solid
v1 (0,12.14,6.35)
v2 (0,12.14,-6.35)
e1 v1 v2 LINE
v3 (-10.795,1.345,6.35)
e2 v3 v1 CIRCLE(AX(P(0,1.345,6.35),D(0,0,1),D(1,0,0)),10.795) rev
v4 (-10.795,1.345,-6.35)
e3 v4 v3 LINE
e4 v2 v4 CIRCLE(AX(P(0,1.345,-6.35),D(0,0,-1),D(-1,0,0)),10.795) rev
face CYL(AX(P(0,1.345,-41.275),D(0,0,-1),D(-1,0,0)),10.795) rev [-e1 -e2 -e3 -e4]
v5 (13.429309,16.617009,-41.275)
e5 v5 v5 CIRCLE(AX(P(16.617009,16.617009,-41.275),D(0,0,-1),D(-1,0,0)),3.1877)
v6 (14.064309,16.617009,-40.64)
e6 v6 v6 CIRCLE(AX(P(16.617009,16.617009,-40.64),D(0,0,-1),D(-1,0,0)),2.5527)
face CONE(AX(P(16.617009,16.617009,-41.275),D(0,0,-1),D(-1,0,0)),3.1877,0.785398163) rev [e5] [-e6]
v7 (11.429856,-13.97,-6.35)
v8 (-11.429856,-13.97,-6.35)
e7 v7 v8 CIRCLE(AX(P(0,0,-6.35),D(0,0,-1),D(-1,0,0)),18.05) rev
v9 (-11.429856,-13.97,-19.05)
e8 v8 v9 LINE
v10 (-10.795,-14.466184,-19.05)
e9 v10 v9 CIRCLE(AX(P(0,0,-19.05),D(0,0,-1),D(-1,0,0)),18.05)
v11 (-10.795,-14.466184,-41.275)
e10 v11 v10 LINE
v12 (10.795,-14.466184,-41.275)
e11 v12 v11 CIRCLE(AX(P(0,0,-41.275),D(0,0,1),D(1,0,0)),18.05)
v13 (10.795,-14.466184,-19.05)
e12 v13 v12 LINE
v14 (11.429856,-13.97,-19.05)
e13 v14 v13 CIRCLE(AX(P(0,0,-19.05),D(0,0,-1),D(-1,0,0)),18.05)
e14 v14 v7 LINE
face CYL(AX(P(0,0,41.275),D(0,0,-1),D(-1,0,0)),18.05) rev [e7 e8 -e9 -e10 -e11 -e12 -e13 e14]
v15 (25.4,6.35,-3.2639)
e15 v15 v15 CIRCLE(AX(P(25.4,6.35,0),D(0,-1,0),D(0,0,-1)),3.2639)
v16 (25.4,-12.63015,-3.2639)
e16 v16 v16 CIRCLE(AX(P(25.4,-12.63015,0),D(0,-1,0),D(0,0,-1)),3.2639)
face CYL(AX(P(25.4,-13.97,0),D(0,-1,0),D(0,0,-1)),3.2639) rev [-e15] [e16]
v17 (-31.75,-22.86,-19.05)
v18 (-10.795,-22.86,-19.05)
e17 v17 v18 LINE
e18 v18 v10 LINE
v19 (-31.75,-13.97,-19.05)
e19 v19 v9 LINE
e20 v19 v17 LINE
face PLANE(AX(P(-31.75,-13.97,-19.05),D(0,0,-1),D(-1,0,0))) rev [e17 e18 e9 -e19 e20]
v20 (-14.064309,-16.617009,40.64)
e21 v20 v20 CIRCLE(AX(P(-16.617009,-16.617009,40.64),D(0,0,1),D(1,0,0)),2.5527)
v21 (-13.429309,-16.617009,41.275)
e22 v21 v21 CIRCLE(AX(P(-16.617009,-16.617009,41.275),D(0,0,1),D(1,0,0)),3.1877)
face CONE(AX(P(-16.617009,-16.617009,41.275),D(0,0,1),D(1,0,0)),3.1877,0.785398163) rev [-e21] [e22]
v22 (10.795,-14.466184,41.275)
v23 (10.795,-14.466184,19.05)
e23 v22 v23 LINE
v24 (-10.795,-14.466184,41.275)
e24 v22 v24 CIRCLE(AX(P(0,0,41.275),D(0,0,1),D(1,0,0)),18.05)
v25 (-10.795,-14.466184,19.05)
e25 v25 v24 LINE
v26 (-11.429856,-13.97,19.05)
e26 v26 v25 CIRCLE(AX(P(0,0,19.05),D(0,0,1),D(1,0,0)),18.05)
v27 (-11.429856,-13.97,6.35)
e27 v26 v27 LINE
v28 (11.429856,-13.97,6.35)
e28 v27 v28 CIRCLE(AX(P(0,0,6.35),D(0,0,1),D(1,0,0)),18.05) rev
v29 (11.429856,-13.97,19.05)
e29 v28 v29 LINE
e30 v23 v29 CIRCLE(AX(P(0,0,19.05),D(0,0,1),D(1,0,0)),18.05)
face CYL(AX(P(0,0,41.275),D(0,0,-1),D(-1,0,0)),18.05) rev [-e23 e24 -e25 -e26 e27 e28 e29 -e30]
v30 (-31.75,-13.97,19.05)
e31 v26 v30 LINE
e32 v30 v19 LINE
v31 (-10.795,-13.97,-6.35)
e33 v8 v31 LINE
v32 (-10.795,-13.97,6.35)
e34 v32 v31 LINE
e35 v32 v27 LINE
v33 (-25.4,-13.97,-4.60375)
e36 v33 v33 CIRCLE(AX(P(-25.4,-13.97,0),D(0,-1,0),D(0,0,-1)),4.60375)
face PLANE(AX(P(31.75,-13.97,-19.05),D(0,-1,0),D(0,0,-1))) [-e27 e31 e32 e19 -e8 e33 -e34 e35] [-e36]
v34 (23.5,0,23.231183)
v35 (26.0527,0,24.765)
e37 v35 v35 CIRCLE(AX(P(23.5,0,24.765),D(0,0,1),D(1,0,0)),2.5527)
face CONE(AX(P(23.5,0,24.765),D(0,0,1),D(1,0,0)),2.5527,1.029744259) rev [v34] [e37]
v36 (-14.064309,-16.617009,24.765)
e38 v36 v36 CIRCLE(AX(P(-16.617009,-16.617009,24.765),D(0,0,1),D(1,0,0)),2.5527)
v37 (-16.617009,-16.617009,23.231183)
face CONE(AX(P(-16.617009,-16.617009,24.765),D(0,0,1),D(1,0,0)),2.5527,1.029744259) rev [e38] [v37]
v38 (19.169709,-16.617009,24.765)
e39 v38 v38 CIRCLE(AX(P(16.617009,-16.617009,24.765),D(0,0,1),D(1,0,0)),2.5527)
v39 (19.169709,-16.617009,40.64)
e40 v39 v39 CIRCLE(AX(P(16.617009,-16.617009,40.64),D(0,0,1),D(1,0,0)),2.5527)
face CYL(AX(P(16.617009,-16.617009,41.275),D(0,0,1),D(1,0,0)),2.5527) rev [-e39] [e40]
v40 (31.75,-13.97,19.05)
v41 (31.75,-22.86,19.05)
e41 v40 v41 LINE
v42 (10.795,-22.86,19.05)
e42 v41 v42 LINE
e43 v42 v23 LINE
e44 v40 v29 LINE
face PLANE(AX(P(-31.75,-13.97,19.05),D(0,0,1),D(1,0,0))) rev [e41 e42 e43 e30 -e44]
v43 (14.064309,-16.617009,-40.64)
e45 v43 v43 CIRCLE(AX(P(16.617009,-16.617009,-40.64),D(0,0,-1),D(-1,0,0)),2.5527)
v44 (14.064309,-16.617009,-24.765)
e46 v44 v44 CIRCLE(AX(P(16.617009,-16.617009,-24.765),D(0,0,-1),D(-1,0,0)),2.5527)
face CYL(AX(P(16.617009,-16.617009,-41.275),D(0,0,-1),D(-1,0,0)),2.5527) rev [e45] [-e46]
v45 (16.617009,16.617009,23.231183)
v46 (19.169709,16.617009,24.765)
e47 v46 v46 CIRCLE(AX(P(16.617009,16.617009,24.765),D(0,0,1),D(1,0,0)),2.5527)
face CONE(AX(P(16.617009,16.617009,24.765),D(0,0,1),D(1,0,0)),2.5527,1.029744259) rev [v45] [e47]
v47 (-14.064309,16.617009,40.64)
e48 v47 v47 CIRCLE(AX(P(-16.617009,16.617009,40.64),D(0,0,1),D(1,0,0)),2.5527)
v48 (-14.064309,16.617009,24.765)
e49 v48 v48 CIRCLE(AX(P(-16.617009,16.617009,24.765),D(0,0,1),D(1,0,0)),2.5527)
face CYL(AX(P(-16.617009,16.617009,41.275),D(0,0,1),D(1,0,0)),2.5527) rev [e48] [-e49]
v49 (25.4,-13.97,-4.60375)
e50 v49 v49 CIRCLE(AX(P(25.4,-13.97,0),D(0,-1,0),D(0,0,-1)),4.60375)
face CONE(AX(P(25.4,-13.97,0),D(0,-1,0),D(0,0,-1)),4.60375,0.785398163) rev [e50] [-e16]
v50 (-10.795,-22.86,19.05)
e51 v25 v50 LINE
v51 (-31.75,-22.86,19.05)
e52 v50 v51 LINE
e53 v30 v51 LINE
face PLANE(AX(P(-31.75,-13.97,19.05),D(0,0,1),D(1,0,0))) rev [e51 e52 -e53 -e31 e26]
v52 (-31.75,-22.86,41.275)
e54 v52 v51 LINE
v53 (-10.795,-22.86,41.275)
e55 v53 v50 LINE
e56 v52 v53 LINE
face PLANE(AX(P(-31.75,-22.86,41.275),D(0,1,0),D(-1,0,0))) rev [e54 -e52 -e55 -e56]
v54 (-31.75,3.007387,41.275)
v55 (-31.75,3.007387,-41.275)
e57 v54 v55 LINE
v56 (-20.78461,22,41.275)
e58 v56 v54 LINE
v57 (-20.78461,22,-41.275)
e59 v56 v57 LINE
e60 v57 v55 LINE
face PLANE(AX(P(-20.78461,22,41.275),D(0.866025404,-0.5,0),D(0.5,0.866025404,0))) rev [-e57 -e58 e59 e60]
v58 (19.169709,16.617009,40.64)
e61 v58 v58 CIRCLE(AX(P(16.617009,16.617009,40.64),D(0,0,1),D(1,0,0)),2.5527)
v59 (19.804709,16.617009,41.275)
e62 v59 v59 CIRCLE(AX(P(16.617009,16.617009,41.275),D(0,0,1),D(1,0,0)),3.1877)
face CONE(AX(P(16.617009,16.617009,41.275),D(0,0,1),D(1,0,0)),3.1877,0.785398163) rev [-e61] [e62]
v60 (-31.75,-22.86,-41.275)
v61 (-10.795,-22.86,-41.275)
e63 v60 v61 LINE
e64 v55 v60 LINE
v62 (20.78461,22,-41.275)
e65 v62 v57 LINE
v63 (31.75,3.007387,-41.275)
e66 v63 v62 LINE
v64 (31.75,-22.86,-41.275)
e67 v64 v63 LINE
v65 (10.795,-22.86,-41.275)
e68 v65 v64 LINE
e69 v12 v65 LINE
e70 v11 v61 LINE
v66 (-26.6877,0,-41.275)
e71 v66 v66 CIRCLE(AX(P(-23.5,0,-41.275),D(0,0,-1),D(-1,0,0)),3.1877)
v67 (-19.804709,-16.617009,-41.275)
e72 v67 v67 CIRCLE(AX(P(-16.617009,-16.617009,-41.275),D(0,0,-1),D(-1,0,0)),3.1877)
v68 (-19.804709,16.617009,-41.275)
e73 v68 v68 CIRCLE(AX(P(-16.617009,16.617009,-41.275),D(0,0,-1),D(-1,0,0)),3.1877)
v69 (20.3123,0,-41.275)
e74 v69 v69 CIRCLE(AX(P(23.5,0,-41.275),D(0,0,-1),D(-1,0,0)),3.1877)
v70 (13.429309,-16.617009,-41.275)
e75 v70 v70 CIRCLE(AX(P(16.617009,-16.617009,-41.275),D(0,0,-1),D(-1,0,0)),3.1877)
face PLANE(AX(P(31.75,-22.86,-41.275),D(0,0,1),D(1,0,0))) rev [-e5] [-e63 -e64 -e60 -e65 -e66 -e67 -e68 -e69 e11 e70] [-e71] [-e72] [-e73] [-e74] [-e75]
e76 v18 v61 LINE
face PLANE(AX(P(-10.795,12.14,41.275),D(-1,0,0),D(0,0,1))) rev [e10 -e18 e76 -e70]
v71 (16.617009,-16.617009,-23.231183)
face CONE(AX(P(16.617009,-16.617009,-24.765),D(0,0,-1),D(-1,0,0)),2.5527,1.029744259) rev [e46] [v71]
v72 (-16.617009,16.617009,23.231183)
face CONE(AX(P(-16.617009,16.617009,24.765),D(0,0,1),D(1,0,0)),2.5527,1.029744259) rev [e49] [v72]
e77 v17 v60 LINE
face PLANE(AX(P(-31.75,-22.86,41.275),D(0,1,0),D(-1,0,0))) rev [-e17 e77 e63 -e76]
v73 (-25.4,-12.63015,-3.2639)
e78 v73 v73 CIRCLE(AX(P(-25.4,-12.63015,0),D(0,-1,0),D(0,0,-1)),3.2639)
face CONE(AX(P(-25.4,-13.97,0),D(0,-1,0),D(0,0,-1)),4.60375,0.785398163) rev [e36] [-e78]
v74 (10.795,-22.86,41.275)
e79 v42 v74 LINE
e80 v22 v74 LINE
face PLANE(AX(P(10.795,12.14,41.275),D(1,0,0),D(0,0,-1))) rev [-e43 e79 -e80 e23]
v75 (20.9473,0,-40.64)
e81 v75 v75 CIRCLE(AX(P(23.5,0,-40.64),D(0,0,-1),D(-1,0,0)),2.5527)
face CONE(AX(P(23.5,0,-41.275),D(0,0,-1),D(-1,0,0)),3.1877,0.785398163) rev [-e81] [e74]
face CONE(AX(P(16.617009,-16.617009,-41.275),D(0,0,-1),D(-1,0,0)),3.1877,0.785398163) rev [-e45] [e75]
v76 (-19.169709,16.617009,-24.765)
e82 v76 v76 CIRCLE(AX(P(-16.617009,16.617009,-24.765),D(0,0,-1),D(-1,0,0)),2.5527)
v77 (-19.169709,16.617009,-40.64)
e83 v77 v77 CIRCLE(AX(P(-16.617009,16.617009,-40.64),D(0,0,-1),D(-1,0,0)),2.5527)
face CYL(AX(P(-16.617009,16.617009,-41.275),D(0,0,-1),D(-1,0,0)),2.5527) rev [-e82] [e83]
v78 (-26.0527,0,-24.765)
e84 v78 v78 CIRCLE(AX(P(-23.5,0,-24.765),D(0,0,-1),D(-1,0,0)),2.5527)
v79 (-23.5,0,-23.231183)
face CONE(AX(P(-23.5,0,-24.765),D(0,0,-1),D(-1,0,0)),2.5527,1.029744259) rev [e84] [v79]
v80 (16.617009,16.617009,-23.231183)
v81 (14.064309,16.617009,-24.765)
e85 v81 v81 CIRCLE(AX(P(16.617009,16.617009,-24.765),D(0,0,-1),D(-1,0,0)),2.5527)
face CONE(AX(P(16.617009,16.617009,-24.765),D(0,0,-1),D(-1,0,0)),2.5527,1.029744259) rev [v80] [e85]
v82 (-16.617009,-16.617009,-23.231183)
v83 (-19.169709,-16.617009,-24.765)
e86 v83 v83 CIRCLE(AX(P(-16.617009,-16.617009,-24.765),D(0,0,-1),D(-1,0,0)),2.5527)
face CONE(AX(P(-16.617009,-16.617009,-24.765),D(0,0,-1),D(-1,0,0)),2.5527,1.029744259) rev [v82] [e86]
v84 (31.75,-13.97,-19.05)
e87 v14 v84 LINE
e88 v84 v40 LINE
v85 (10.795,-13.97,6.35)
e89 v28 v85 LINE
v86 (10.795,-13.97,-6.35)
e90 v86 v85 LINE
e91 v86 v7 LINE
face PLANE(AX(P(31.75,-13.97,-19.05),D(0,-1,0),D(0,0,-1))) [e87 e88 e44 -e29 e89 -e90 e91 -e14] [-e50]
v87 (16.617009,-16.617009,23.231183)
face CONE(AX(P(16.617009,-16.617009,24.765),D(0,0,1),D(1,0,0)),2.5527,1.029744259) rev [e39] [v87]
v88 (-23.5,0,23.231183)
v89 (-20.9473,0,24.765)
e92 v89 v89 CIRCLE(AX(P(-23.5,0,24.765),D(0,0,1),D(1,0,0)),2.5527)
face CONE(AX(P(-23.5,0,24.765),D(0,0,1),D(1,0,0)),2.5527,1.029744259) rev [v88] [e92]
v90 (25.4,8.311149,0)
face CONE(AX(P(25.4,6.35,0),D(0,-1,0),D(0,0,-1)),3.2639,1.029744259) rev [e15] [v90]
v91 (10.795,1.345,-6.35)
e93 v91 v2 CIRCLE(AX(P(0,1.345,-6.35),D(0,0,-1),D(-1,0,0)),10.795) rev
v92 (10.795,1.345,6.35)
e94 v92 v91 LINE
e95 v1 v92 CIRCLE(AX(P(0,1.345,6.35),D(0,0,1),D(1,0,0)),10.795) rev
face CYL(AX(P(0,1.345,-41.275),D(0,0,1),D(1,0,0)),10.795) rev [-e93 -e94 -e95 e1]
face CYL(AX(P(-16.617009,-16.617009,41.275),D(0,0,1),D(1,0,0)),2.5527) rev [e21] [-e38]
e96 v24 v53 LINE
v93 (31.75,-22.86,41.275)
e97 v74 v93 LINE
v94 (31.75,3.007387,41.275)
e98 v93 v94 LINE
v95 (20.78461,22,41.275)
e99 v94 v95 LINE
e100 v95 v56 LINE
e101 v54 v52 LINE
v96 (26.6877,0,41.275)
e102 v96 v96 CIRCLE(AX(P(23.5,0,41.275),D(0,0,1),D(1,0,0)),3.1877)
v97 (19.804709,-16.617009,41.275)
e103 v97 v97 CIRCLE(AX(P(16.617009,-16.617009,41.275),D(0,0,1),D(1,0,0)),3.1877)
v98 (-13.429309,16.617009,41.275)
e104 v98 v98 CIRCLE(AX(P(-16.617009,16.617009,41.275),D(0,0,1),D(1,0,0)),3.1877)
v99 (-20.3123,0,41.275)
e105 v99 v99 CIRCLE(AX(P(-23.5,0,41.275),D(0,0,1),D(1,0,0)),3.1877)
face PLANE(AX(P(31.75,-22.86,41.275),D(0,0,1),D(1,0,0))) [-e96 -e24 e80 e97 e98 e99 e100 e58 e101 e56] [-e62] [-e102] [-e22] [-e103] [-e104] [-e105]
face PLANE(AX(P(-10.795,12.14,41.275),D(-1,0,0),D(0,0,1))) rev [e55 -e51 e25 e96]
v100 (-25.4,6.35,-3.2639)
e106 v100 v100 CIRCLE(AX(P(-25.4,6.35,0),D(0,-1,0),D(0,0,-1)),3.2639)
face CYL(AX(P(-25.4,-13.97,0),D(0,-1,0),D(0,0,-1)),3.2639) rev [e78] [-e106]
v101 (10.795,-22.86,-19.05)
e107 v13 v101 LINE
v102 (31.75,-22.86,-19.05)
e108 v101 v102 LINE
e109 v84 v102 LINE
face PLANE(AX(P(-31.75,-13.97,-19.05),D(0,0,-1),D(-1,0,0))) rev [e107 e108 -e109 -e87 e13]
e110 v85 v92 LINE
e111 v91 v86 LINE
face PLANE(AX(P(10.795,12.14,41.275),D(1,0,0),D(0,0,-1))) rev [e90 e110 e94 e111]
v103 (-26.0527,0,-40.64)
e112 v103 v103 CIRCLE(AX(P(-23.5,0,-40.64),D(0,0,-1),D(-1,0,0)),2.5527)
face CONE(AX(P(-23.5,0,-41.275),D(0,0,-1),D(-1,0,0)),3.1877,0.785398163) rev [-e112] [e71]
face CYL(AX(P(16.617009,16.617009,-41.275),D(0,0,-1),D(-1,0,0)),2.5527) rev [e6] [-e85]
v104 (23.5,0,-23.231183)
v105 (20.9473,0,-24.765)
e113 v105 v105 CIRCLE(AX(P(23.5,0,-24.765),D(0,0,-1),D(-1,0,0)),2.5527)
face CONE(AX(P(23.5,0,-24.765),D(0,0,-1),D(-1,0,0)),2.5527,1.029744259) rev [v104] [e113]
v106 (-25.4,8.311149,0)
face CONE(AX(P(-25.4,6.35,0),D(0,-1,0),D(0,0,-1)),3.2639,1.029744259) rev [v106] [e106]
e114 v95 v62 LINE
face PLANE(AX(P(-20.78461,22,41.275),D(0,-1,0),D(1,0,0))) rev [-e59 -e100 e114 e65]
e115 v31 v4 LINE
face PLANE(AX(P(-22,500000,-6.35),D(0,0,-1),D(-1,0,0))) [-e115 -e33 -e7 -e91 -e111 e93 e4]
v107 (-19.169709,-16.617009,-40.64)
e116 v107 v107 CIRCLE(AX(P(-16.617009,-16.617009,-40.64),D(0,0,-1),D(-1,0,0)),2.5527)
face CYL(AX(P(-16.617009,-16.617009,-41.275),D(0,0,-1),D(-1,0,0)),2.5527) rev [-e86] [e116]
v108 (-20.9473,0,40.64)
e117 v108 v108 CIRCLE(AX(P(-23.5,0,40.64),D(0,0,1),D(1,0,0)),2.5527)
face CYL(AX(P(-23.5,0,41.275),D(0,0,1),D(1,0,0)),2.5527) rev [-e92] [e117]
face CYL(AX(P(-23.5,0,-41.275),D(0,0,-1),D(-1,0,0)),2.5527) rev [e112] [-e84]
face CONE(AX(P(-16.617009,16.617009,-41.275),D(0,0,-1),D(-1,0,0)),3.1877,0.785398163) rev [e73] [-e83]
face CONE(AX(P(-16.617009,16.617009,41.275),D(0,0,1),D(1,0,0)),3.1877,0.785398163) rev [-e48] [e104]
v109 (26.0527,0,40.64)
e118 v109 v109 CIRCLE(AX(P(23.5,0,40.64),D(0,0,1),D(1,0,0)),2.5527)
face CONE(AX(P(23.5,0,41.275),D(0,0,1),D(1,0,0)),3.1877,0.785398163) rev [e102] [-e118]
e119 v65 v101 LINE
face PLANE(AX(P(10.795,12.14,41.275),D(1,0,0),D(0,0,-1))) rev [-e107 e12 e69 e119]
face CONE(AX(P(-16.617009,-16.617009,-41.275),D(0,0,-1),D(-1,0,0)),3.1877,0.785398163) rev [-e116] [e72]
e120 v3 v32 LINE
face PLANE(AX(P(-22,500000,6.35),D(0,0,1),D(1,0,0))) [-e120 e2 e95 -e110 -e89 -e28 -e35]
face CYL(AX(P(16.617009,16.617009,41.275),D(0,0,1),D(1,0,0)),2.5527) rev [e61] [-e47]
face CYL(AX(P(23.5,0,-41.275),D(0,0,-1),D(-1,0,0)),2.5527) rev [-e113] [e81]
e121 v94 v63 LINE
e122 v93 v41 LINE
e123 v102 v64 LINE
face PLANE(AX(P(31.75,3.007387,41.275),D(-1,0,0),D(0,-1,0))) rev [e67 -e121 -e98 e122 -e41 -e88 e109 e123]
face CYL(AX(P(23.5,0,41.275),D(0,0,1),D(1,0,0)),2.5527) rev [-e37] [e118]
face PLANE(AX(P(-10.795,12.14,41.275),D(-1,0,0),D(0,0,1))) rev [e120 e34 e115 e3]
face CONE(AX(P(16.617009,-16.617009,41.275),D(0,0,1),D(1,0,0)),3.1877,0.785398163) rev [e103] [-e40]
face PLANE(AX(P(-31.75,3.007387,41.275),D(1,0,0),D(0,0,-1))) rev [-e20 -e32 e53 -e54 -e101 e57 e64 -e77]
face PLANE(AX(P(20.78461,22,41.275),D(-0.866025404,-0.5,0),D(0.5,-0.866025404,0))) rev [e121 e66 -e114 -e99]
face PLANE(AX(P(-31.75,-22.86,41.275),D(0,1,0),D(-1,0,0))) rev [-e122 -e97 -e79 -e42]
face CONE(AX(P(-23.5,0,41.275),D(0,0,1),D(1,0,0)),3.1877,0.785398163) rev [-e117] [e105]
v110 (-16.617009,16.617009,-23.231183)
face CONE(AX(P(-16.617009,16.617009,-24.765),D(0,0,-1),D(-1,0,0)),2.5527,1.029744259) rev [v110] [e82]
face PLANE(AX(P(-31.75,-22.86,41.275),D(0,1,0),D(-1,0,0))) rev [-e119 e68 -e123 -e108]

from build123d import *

# Parameters (mm, degrees)
SKETCH1_R                          = 18.05
BOSS_EXTRUDE1_DEPTH                = 41.275
SKETCH6_W                          = 63.5
SKETCH6_H                          = 38.1
CUT_EXTRUDE1_DEPTH                 = 8.89
BOSS_EXTRUDE2_REACH                = 65.289
SKETCH12_W                         = 44
SKETCH12_H                         = 12.7
SKETCH7_W                          = 21.59
SKETCH7_H                          = 82.55
CUT_EXTRUDE2_DEPTH                 = 35
FILLET1_R                          = 10.795
F_1_4_20_TAPPED_HOLE1_AT_2_COUNT   = 2
F_1_4_20_TAPPED_HOLE1_AT_2_PITCH   = 17.986121321
F_1_4_20_TAPPED_HOLE1_AT_3_COUNT   = 2
F_1_4_20_TAPPED_HOLE1_AT_3_PITCH   = 33.234018716
F_1_4_20_TAPPED_HOLE1_AT_4_COUNT   = 2
F_1_4_20_TAPPED_HOLE1_AT_4_PITCH   = 47
F_1_4_20_TAPPED_HOLE1_AT_5_COUNT   = 2
F_1_4_20_TAPPED_HOLE1_AT_5_PITCH   = 43.422338028
F_1_4_20_TAPPED_HOLE1_AT_6_COUNT   = 2
F_1_4_20_TAPPED_HOLE1_AT_6_PITCH   = 33.234018716
F_5_16_18_TAPPED_HOLE1_D           = 6.5278
F_5_16_18_TAPPED_HOLE1_DEPTH       = 20.32
F_5_16_18_TAPPED_HOLE1_CSINK_D     = 9.2075
F_5_16_18_TAPPED_HOLE1_CSINK_ANGLE = 90
F_5_16_18_TAPPED_HOLE1_TIP         = 1.961148974


with BuildPart() as part:
    # Sketch1 → Boss-Extrude1 (new, symmetric)
    with BuildSketch(Plane.XY):
        Polygon((-20.784609691, 22), (20.784609691, 22), (31.75, 3.00738686), (31.75, -22.86), (-31.75, -22.86), (-31.75, 3.00738686), align=None)
        Circle(SKETCH1_R, mode=Mode.SUBTRACT)
    extrude(amount=BOSS_EXTRUDE1_DEPTH, both=True)

    # Sketch6 → Cut-Extrude1 (cut)
    with BuildSketch(Plane.XZ.offset(22.86)):
        Rectangle(SKETCH6_W, SKETCH6_H)
    extrude(amount=-CUT_EXTRUDE1_DEPTH, mode=Mode.SUBTRACT)

    # Sketch12 → Boss-Extrude2 (add, up to next)
    with BuildSketch(Plane.XZ.offset(13.97), mode=Mode.PRIVATE) as boss_extrude2_sk1:
        Rectangle(SKETCH12_W, SKETCH12_H)
    boss_extrude2_tool1 = extrude(boss_extrude2_sk1.sketch, amount=-BOSS_EXTRUDE2_REACH, mode=Mode.PRIVATE) - part.part
    add(boss_extrude2_tool1.solids().sort_by_distance((0, -13.97, 0))[0])

    # Sketch7 → Cut-Extrude2 (cut)
    with BuildSketch(Plane.XZ.offset(22.86)):
        Rectangle(SKETCH7_W, SKETCH7_H)
    extrude(amount=-CUT_EXTRUDE2_DEPTH, mode=Mode.SUBTRACT)

    # Fillet1
    fillet1_edges = [part.edges().sort_by_distance(p)[0] for p in [
        (10.795, 12.14, 0),
        (-10.795, 12.14, 0),
    ]]
    fillet(fillet1_edges, radius=FILLET1_R - 0.0001)  # a hair under: the kernel refuses the full size

    # Sketch3 → 1/4-20 Tapped Hole1 (revolve, cut)
    with BuildSketch(Plane(origin=(-16.617009358, 16.617009358, 41.275), x_dir=(0, -1, 0), z_dir=(1, 0, 0))):
        Polygon((0, 0), (0, 18.043816902), (2.5527, 16.51), (2.5527, 0.635), (3.1877, 0), align=None)
    f_1_4_20_tapped_hole1 = revolve(axis=Axis((-16.617009358, 16.617009358, 47.625), (0, 0, -1)), mode=Mode.SUBTRACT)

    # 1/4-20 Tapped Hole1 at 2: 1/4-20 Tapped Hole1 ×2
    with Locations(*[Vector(-0.38268343236508695, -0.923879532511288, 0) * (i * F_1_4_20_TAPPED_HOLE1_AT_2_PITCH) for i in range(1, F_1_4_20_TAPPED_HOLE1_AT_2_COUNT)]):
        add(f_1_4_20_tapped_hole1, mode=Mode.SUBTRACT)

    # 1/4-20 Tapped Hole1 at 3: 1/4-20 Tapped Hole1 ×2
    with Locations(*[(0, -i * F_1_4_20_TAPPED_HOLE1_AT_3_PITCH, 0) for i in range(1, F_1_4_20_TAPPED_HOLE1_AT_3_COUNT)]):
        add(f_1_4_20_tapped_hole1, mode=Mode.SUBTRACT)

    # 1/4-20 Tapped Hole1 at 4: 1/4-20 Tapped Hole1 ×2
    with Locations(*[Vector(0.7071067811865517, -0.7071067811865434, 0) * (i * F_1_4_20_TAPPED_HOLE1_AT_4_PITCH) for i in range(1, F_1_4_20_TAPPED_HOLE1_AT_4_COUNT)]):
        add(f_1_4_20_tapped_hole1, mode=Mode.SUBTRACT)

    # 1/4-20 Tapped Hole1 at 5: 1/4-20 Tapped Hole1 ×2
    with Locations(*[Vector(0.9238795325112865, -0.38268343236509034, 0) * (i * F_1_4_20_TAPPED_HOLE1_AT_5_PITCH) for i in range(1, F_1_4_20_TAPPED_HOLE1_AT_5_COUNT)]):
        add(f_1_4_20_tapped_hole1, mode=Mode.SUBTRACT)

    # 1/4-20 Tapped Hole1 at 6: 1/4-20 Tapped Hole1 ×2
    with Locations(*[(i * F_1_4_20_TAPPED_HOLE1_AT_6_PITCH, 0, 0) for i in range(1, F_1_4_20_TAPPED_HOLE1_AT_6_COUNT)]):
        add(f_1_4_20_tapped_hole1, mode=Mode.SUBTRACT)

    # Mirror1: 1/4-20 Tapped Hole1 across plane
    add(f_1_4_20_tapped_hole1.mirror(Plane.XY), mode=Mode.SUBTRACT)

    # Mirror1 copy 1 sketch → Mirror1 copy 1 (revolve, cut)
    with BuildSketch(Plane(origin=(-23.5, 0, -41.275), x_dir=(0, -1, 0), z_dir=(1, 0, 0))):
        Polygon((0, 0), (0, -18.043816902), (2.5527, -16.51), (2.5527, -0.635), (3.1877, 0), align=None)
    revolve(axis=Axis((-23.5, 0, -47.625), (0, 0, -1)), mode=Mode.SUBTRACT)

    # Mirror1 copy 2 sketch → Mirror1 copy 2 (revolve, cut)
    with BuildSketch(Plane(origin=(-16.617009358, -16.617009358, -41.275), x_dir=(0, -1, 0), z_dir=(1, 0, 0))):
        Polygon((0, 0), (0, -18.043816902), (2.5527, -16.51), (2.5527, -0.635), (3.1877, 0), align=None)
    revolve(axis=Axis((-16.617009358, -16.617009358, -47.625), (0, 0, -1)), mode=Mode.SUBTRACT)

    # Mirror1 copy 3 sketch → Mirror1 copy 3 (revolve, cut)
    with BuildSketch(Plane(origin=(16.617009358, -16.617009358, -41.275), x_dir=(0, -1, 0), z_dir=(1, 0, 0))):
        Polygon((0, 0), (0, -18.043816902), (2.5527, -16.51), (2.5527, -0.635), (3.1877, 0), align=None)
    revolve(axis=Axis((16.617009358, -16.617009358, -47.625), (0, 0, -1)), mode=Mode.SUBTRACT)

    # Mirror1 copy 4 sketch → Mirror1 copy 4 (revolve, cut)
    with BuildSketch(Plane(origin=(23.5, 0, -41.275), x_dir=(0, -1, 0), z_dir=(1, 0, 0))):
        Polygon((0, 0), (0, -18.043816902), (2.5527, -16.51), (2.5527, -0.635), (3.1877, 0), align=None)
    revolve(axis=Axis((23.5, 0, -47.625), (0, 0, -1)), mode=Mode.SUBTRACT)

    # Mirror1 copy 5 sketch → Mirror1 copy 5 (revolve, cut)
    with BuildSketch(Plane(origin=(16.617009358, 16.617009358, -41.275), x_dir=(0, -1, 0), z_dir=(1, 0, 0))):
        Polygon((0, 0), (0, -18.043816902), (2.5527, -16.51), (2.5527, -0.635), (3.1877, 0), align=None)
    revolve(axis=Axis((16.617009358, 16.617009358, -47.625), (0, 0, -1)), mode=Mode.SUBTRACT)

    # 5/16-18 Tapped Hole1
    with Locations(Plane(origin=(0, -13.97, 0), x_dir=(-1, 0, 0), z_dir=(0, -1, 0))):
        with Locations((-25.4, 0), (25.4, 0)):
            CounterSinkHole(F_5_16_18_TAPPED_HOLE1_D / 2, F_5_16_18_TAPPED_HOLE1_CSINK_D / 2, depth=F_5_16_18_TAPPED_HOLE1_DEPTH, counter_sink_angle=F_5_16_18_TAPPED_HOLE1_CSINK_ANGLE)
            with Locations((0, 0, -(F_5_16_18_TAPPED_HOLE1_DEPTH + F_5_16_18_TAPPED_HOLE1_TIP / 2))):  # 118° drill point
                Cone(0, F_5_16_18_TAPPED_HOLE1_D / 2, F_5_16_18_TAPPED_HOLE1_TIP, mode=Mode.SUBTRACT)


solid = part.part
